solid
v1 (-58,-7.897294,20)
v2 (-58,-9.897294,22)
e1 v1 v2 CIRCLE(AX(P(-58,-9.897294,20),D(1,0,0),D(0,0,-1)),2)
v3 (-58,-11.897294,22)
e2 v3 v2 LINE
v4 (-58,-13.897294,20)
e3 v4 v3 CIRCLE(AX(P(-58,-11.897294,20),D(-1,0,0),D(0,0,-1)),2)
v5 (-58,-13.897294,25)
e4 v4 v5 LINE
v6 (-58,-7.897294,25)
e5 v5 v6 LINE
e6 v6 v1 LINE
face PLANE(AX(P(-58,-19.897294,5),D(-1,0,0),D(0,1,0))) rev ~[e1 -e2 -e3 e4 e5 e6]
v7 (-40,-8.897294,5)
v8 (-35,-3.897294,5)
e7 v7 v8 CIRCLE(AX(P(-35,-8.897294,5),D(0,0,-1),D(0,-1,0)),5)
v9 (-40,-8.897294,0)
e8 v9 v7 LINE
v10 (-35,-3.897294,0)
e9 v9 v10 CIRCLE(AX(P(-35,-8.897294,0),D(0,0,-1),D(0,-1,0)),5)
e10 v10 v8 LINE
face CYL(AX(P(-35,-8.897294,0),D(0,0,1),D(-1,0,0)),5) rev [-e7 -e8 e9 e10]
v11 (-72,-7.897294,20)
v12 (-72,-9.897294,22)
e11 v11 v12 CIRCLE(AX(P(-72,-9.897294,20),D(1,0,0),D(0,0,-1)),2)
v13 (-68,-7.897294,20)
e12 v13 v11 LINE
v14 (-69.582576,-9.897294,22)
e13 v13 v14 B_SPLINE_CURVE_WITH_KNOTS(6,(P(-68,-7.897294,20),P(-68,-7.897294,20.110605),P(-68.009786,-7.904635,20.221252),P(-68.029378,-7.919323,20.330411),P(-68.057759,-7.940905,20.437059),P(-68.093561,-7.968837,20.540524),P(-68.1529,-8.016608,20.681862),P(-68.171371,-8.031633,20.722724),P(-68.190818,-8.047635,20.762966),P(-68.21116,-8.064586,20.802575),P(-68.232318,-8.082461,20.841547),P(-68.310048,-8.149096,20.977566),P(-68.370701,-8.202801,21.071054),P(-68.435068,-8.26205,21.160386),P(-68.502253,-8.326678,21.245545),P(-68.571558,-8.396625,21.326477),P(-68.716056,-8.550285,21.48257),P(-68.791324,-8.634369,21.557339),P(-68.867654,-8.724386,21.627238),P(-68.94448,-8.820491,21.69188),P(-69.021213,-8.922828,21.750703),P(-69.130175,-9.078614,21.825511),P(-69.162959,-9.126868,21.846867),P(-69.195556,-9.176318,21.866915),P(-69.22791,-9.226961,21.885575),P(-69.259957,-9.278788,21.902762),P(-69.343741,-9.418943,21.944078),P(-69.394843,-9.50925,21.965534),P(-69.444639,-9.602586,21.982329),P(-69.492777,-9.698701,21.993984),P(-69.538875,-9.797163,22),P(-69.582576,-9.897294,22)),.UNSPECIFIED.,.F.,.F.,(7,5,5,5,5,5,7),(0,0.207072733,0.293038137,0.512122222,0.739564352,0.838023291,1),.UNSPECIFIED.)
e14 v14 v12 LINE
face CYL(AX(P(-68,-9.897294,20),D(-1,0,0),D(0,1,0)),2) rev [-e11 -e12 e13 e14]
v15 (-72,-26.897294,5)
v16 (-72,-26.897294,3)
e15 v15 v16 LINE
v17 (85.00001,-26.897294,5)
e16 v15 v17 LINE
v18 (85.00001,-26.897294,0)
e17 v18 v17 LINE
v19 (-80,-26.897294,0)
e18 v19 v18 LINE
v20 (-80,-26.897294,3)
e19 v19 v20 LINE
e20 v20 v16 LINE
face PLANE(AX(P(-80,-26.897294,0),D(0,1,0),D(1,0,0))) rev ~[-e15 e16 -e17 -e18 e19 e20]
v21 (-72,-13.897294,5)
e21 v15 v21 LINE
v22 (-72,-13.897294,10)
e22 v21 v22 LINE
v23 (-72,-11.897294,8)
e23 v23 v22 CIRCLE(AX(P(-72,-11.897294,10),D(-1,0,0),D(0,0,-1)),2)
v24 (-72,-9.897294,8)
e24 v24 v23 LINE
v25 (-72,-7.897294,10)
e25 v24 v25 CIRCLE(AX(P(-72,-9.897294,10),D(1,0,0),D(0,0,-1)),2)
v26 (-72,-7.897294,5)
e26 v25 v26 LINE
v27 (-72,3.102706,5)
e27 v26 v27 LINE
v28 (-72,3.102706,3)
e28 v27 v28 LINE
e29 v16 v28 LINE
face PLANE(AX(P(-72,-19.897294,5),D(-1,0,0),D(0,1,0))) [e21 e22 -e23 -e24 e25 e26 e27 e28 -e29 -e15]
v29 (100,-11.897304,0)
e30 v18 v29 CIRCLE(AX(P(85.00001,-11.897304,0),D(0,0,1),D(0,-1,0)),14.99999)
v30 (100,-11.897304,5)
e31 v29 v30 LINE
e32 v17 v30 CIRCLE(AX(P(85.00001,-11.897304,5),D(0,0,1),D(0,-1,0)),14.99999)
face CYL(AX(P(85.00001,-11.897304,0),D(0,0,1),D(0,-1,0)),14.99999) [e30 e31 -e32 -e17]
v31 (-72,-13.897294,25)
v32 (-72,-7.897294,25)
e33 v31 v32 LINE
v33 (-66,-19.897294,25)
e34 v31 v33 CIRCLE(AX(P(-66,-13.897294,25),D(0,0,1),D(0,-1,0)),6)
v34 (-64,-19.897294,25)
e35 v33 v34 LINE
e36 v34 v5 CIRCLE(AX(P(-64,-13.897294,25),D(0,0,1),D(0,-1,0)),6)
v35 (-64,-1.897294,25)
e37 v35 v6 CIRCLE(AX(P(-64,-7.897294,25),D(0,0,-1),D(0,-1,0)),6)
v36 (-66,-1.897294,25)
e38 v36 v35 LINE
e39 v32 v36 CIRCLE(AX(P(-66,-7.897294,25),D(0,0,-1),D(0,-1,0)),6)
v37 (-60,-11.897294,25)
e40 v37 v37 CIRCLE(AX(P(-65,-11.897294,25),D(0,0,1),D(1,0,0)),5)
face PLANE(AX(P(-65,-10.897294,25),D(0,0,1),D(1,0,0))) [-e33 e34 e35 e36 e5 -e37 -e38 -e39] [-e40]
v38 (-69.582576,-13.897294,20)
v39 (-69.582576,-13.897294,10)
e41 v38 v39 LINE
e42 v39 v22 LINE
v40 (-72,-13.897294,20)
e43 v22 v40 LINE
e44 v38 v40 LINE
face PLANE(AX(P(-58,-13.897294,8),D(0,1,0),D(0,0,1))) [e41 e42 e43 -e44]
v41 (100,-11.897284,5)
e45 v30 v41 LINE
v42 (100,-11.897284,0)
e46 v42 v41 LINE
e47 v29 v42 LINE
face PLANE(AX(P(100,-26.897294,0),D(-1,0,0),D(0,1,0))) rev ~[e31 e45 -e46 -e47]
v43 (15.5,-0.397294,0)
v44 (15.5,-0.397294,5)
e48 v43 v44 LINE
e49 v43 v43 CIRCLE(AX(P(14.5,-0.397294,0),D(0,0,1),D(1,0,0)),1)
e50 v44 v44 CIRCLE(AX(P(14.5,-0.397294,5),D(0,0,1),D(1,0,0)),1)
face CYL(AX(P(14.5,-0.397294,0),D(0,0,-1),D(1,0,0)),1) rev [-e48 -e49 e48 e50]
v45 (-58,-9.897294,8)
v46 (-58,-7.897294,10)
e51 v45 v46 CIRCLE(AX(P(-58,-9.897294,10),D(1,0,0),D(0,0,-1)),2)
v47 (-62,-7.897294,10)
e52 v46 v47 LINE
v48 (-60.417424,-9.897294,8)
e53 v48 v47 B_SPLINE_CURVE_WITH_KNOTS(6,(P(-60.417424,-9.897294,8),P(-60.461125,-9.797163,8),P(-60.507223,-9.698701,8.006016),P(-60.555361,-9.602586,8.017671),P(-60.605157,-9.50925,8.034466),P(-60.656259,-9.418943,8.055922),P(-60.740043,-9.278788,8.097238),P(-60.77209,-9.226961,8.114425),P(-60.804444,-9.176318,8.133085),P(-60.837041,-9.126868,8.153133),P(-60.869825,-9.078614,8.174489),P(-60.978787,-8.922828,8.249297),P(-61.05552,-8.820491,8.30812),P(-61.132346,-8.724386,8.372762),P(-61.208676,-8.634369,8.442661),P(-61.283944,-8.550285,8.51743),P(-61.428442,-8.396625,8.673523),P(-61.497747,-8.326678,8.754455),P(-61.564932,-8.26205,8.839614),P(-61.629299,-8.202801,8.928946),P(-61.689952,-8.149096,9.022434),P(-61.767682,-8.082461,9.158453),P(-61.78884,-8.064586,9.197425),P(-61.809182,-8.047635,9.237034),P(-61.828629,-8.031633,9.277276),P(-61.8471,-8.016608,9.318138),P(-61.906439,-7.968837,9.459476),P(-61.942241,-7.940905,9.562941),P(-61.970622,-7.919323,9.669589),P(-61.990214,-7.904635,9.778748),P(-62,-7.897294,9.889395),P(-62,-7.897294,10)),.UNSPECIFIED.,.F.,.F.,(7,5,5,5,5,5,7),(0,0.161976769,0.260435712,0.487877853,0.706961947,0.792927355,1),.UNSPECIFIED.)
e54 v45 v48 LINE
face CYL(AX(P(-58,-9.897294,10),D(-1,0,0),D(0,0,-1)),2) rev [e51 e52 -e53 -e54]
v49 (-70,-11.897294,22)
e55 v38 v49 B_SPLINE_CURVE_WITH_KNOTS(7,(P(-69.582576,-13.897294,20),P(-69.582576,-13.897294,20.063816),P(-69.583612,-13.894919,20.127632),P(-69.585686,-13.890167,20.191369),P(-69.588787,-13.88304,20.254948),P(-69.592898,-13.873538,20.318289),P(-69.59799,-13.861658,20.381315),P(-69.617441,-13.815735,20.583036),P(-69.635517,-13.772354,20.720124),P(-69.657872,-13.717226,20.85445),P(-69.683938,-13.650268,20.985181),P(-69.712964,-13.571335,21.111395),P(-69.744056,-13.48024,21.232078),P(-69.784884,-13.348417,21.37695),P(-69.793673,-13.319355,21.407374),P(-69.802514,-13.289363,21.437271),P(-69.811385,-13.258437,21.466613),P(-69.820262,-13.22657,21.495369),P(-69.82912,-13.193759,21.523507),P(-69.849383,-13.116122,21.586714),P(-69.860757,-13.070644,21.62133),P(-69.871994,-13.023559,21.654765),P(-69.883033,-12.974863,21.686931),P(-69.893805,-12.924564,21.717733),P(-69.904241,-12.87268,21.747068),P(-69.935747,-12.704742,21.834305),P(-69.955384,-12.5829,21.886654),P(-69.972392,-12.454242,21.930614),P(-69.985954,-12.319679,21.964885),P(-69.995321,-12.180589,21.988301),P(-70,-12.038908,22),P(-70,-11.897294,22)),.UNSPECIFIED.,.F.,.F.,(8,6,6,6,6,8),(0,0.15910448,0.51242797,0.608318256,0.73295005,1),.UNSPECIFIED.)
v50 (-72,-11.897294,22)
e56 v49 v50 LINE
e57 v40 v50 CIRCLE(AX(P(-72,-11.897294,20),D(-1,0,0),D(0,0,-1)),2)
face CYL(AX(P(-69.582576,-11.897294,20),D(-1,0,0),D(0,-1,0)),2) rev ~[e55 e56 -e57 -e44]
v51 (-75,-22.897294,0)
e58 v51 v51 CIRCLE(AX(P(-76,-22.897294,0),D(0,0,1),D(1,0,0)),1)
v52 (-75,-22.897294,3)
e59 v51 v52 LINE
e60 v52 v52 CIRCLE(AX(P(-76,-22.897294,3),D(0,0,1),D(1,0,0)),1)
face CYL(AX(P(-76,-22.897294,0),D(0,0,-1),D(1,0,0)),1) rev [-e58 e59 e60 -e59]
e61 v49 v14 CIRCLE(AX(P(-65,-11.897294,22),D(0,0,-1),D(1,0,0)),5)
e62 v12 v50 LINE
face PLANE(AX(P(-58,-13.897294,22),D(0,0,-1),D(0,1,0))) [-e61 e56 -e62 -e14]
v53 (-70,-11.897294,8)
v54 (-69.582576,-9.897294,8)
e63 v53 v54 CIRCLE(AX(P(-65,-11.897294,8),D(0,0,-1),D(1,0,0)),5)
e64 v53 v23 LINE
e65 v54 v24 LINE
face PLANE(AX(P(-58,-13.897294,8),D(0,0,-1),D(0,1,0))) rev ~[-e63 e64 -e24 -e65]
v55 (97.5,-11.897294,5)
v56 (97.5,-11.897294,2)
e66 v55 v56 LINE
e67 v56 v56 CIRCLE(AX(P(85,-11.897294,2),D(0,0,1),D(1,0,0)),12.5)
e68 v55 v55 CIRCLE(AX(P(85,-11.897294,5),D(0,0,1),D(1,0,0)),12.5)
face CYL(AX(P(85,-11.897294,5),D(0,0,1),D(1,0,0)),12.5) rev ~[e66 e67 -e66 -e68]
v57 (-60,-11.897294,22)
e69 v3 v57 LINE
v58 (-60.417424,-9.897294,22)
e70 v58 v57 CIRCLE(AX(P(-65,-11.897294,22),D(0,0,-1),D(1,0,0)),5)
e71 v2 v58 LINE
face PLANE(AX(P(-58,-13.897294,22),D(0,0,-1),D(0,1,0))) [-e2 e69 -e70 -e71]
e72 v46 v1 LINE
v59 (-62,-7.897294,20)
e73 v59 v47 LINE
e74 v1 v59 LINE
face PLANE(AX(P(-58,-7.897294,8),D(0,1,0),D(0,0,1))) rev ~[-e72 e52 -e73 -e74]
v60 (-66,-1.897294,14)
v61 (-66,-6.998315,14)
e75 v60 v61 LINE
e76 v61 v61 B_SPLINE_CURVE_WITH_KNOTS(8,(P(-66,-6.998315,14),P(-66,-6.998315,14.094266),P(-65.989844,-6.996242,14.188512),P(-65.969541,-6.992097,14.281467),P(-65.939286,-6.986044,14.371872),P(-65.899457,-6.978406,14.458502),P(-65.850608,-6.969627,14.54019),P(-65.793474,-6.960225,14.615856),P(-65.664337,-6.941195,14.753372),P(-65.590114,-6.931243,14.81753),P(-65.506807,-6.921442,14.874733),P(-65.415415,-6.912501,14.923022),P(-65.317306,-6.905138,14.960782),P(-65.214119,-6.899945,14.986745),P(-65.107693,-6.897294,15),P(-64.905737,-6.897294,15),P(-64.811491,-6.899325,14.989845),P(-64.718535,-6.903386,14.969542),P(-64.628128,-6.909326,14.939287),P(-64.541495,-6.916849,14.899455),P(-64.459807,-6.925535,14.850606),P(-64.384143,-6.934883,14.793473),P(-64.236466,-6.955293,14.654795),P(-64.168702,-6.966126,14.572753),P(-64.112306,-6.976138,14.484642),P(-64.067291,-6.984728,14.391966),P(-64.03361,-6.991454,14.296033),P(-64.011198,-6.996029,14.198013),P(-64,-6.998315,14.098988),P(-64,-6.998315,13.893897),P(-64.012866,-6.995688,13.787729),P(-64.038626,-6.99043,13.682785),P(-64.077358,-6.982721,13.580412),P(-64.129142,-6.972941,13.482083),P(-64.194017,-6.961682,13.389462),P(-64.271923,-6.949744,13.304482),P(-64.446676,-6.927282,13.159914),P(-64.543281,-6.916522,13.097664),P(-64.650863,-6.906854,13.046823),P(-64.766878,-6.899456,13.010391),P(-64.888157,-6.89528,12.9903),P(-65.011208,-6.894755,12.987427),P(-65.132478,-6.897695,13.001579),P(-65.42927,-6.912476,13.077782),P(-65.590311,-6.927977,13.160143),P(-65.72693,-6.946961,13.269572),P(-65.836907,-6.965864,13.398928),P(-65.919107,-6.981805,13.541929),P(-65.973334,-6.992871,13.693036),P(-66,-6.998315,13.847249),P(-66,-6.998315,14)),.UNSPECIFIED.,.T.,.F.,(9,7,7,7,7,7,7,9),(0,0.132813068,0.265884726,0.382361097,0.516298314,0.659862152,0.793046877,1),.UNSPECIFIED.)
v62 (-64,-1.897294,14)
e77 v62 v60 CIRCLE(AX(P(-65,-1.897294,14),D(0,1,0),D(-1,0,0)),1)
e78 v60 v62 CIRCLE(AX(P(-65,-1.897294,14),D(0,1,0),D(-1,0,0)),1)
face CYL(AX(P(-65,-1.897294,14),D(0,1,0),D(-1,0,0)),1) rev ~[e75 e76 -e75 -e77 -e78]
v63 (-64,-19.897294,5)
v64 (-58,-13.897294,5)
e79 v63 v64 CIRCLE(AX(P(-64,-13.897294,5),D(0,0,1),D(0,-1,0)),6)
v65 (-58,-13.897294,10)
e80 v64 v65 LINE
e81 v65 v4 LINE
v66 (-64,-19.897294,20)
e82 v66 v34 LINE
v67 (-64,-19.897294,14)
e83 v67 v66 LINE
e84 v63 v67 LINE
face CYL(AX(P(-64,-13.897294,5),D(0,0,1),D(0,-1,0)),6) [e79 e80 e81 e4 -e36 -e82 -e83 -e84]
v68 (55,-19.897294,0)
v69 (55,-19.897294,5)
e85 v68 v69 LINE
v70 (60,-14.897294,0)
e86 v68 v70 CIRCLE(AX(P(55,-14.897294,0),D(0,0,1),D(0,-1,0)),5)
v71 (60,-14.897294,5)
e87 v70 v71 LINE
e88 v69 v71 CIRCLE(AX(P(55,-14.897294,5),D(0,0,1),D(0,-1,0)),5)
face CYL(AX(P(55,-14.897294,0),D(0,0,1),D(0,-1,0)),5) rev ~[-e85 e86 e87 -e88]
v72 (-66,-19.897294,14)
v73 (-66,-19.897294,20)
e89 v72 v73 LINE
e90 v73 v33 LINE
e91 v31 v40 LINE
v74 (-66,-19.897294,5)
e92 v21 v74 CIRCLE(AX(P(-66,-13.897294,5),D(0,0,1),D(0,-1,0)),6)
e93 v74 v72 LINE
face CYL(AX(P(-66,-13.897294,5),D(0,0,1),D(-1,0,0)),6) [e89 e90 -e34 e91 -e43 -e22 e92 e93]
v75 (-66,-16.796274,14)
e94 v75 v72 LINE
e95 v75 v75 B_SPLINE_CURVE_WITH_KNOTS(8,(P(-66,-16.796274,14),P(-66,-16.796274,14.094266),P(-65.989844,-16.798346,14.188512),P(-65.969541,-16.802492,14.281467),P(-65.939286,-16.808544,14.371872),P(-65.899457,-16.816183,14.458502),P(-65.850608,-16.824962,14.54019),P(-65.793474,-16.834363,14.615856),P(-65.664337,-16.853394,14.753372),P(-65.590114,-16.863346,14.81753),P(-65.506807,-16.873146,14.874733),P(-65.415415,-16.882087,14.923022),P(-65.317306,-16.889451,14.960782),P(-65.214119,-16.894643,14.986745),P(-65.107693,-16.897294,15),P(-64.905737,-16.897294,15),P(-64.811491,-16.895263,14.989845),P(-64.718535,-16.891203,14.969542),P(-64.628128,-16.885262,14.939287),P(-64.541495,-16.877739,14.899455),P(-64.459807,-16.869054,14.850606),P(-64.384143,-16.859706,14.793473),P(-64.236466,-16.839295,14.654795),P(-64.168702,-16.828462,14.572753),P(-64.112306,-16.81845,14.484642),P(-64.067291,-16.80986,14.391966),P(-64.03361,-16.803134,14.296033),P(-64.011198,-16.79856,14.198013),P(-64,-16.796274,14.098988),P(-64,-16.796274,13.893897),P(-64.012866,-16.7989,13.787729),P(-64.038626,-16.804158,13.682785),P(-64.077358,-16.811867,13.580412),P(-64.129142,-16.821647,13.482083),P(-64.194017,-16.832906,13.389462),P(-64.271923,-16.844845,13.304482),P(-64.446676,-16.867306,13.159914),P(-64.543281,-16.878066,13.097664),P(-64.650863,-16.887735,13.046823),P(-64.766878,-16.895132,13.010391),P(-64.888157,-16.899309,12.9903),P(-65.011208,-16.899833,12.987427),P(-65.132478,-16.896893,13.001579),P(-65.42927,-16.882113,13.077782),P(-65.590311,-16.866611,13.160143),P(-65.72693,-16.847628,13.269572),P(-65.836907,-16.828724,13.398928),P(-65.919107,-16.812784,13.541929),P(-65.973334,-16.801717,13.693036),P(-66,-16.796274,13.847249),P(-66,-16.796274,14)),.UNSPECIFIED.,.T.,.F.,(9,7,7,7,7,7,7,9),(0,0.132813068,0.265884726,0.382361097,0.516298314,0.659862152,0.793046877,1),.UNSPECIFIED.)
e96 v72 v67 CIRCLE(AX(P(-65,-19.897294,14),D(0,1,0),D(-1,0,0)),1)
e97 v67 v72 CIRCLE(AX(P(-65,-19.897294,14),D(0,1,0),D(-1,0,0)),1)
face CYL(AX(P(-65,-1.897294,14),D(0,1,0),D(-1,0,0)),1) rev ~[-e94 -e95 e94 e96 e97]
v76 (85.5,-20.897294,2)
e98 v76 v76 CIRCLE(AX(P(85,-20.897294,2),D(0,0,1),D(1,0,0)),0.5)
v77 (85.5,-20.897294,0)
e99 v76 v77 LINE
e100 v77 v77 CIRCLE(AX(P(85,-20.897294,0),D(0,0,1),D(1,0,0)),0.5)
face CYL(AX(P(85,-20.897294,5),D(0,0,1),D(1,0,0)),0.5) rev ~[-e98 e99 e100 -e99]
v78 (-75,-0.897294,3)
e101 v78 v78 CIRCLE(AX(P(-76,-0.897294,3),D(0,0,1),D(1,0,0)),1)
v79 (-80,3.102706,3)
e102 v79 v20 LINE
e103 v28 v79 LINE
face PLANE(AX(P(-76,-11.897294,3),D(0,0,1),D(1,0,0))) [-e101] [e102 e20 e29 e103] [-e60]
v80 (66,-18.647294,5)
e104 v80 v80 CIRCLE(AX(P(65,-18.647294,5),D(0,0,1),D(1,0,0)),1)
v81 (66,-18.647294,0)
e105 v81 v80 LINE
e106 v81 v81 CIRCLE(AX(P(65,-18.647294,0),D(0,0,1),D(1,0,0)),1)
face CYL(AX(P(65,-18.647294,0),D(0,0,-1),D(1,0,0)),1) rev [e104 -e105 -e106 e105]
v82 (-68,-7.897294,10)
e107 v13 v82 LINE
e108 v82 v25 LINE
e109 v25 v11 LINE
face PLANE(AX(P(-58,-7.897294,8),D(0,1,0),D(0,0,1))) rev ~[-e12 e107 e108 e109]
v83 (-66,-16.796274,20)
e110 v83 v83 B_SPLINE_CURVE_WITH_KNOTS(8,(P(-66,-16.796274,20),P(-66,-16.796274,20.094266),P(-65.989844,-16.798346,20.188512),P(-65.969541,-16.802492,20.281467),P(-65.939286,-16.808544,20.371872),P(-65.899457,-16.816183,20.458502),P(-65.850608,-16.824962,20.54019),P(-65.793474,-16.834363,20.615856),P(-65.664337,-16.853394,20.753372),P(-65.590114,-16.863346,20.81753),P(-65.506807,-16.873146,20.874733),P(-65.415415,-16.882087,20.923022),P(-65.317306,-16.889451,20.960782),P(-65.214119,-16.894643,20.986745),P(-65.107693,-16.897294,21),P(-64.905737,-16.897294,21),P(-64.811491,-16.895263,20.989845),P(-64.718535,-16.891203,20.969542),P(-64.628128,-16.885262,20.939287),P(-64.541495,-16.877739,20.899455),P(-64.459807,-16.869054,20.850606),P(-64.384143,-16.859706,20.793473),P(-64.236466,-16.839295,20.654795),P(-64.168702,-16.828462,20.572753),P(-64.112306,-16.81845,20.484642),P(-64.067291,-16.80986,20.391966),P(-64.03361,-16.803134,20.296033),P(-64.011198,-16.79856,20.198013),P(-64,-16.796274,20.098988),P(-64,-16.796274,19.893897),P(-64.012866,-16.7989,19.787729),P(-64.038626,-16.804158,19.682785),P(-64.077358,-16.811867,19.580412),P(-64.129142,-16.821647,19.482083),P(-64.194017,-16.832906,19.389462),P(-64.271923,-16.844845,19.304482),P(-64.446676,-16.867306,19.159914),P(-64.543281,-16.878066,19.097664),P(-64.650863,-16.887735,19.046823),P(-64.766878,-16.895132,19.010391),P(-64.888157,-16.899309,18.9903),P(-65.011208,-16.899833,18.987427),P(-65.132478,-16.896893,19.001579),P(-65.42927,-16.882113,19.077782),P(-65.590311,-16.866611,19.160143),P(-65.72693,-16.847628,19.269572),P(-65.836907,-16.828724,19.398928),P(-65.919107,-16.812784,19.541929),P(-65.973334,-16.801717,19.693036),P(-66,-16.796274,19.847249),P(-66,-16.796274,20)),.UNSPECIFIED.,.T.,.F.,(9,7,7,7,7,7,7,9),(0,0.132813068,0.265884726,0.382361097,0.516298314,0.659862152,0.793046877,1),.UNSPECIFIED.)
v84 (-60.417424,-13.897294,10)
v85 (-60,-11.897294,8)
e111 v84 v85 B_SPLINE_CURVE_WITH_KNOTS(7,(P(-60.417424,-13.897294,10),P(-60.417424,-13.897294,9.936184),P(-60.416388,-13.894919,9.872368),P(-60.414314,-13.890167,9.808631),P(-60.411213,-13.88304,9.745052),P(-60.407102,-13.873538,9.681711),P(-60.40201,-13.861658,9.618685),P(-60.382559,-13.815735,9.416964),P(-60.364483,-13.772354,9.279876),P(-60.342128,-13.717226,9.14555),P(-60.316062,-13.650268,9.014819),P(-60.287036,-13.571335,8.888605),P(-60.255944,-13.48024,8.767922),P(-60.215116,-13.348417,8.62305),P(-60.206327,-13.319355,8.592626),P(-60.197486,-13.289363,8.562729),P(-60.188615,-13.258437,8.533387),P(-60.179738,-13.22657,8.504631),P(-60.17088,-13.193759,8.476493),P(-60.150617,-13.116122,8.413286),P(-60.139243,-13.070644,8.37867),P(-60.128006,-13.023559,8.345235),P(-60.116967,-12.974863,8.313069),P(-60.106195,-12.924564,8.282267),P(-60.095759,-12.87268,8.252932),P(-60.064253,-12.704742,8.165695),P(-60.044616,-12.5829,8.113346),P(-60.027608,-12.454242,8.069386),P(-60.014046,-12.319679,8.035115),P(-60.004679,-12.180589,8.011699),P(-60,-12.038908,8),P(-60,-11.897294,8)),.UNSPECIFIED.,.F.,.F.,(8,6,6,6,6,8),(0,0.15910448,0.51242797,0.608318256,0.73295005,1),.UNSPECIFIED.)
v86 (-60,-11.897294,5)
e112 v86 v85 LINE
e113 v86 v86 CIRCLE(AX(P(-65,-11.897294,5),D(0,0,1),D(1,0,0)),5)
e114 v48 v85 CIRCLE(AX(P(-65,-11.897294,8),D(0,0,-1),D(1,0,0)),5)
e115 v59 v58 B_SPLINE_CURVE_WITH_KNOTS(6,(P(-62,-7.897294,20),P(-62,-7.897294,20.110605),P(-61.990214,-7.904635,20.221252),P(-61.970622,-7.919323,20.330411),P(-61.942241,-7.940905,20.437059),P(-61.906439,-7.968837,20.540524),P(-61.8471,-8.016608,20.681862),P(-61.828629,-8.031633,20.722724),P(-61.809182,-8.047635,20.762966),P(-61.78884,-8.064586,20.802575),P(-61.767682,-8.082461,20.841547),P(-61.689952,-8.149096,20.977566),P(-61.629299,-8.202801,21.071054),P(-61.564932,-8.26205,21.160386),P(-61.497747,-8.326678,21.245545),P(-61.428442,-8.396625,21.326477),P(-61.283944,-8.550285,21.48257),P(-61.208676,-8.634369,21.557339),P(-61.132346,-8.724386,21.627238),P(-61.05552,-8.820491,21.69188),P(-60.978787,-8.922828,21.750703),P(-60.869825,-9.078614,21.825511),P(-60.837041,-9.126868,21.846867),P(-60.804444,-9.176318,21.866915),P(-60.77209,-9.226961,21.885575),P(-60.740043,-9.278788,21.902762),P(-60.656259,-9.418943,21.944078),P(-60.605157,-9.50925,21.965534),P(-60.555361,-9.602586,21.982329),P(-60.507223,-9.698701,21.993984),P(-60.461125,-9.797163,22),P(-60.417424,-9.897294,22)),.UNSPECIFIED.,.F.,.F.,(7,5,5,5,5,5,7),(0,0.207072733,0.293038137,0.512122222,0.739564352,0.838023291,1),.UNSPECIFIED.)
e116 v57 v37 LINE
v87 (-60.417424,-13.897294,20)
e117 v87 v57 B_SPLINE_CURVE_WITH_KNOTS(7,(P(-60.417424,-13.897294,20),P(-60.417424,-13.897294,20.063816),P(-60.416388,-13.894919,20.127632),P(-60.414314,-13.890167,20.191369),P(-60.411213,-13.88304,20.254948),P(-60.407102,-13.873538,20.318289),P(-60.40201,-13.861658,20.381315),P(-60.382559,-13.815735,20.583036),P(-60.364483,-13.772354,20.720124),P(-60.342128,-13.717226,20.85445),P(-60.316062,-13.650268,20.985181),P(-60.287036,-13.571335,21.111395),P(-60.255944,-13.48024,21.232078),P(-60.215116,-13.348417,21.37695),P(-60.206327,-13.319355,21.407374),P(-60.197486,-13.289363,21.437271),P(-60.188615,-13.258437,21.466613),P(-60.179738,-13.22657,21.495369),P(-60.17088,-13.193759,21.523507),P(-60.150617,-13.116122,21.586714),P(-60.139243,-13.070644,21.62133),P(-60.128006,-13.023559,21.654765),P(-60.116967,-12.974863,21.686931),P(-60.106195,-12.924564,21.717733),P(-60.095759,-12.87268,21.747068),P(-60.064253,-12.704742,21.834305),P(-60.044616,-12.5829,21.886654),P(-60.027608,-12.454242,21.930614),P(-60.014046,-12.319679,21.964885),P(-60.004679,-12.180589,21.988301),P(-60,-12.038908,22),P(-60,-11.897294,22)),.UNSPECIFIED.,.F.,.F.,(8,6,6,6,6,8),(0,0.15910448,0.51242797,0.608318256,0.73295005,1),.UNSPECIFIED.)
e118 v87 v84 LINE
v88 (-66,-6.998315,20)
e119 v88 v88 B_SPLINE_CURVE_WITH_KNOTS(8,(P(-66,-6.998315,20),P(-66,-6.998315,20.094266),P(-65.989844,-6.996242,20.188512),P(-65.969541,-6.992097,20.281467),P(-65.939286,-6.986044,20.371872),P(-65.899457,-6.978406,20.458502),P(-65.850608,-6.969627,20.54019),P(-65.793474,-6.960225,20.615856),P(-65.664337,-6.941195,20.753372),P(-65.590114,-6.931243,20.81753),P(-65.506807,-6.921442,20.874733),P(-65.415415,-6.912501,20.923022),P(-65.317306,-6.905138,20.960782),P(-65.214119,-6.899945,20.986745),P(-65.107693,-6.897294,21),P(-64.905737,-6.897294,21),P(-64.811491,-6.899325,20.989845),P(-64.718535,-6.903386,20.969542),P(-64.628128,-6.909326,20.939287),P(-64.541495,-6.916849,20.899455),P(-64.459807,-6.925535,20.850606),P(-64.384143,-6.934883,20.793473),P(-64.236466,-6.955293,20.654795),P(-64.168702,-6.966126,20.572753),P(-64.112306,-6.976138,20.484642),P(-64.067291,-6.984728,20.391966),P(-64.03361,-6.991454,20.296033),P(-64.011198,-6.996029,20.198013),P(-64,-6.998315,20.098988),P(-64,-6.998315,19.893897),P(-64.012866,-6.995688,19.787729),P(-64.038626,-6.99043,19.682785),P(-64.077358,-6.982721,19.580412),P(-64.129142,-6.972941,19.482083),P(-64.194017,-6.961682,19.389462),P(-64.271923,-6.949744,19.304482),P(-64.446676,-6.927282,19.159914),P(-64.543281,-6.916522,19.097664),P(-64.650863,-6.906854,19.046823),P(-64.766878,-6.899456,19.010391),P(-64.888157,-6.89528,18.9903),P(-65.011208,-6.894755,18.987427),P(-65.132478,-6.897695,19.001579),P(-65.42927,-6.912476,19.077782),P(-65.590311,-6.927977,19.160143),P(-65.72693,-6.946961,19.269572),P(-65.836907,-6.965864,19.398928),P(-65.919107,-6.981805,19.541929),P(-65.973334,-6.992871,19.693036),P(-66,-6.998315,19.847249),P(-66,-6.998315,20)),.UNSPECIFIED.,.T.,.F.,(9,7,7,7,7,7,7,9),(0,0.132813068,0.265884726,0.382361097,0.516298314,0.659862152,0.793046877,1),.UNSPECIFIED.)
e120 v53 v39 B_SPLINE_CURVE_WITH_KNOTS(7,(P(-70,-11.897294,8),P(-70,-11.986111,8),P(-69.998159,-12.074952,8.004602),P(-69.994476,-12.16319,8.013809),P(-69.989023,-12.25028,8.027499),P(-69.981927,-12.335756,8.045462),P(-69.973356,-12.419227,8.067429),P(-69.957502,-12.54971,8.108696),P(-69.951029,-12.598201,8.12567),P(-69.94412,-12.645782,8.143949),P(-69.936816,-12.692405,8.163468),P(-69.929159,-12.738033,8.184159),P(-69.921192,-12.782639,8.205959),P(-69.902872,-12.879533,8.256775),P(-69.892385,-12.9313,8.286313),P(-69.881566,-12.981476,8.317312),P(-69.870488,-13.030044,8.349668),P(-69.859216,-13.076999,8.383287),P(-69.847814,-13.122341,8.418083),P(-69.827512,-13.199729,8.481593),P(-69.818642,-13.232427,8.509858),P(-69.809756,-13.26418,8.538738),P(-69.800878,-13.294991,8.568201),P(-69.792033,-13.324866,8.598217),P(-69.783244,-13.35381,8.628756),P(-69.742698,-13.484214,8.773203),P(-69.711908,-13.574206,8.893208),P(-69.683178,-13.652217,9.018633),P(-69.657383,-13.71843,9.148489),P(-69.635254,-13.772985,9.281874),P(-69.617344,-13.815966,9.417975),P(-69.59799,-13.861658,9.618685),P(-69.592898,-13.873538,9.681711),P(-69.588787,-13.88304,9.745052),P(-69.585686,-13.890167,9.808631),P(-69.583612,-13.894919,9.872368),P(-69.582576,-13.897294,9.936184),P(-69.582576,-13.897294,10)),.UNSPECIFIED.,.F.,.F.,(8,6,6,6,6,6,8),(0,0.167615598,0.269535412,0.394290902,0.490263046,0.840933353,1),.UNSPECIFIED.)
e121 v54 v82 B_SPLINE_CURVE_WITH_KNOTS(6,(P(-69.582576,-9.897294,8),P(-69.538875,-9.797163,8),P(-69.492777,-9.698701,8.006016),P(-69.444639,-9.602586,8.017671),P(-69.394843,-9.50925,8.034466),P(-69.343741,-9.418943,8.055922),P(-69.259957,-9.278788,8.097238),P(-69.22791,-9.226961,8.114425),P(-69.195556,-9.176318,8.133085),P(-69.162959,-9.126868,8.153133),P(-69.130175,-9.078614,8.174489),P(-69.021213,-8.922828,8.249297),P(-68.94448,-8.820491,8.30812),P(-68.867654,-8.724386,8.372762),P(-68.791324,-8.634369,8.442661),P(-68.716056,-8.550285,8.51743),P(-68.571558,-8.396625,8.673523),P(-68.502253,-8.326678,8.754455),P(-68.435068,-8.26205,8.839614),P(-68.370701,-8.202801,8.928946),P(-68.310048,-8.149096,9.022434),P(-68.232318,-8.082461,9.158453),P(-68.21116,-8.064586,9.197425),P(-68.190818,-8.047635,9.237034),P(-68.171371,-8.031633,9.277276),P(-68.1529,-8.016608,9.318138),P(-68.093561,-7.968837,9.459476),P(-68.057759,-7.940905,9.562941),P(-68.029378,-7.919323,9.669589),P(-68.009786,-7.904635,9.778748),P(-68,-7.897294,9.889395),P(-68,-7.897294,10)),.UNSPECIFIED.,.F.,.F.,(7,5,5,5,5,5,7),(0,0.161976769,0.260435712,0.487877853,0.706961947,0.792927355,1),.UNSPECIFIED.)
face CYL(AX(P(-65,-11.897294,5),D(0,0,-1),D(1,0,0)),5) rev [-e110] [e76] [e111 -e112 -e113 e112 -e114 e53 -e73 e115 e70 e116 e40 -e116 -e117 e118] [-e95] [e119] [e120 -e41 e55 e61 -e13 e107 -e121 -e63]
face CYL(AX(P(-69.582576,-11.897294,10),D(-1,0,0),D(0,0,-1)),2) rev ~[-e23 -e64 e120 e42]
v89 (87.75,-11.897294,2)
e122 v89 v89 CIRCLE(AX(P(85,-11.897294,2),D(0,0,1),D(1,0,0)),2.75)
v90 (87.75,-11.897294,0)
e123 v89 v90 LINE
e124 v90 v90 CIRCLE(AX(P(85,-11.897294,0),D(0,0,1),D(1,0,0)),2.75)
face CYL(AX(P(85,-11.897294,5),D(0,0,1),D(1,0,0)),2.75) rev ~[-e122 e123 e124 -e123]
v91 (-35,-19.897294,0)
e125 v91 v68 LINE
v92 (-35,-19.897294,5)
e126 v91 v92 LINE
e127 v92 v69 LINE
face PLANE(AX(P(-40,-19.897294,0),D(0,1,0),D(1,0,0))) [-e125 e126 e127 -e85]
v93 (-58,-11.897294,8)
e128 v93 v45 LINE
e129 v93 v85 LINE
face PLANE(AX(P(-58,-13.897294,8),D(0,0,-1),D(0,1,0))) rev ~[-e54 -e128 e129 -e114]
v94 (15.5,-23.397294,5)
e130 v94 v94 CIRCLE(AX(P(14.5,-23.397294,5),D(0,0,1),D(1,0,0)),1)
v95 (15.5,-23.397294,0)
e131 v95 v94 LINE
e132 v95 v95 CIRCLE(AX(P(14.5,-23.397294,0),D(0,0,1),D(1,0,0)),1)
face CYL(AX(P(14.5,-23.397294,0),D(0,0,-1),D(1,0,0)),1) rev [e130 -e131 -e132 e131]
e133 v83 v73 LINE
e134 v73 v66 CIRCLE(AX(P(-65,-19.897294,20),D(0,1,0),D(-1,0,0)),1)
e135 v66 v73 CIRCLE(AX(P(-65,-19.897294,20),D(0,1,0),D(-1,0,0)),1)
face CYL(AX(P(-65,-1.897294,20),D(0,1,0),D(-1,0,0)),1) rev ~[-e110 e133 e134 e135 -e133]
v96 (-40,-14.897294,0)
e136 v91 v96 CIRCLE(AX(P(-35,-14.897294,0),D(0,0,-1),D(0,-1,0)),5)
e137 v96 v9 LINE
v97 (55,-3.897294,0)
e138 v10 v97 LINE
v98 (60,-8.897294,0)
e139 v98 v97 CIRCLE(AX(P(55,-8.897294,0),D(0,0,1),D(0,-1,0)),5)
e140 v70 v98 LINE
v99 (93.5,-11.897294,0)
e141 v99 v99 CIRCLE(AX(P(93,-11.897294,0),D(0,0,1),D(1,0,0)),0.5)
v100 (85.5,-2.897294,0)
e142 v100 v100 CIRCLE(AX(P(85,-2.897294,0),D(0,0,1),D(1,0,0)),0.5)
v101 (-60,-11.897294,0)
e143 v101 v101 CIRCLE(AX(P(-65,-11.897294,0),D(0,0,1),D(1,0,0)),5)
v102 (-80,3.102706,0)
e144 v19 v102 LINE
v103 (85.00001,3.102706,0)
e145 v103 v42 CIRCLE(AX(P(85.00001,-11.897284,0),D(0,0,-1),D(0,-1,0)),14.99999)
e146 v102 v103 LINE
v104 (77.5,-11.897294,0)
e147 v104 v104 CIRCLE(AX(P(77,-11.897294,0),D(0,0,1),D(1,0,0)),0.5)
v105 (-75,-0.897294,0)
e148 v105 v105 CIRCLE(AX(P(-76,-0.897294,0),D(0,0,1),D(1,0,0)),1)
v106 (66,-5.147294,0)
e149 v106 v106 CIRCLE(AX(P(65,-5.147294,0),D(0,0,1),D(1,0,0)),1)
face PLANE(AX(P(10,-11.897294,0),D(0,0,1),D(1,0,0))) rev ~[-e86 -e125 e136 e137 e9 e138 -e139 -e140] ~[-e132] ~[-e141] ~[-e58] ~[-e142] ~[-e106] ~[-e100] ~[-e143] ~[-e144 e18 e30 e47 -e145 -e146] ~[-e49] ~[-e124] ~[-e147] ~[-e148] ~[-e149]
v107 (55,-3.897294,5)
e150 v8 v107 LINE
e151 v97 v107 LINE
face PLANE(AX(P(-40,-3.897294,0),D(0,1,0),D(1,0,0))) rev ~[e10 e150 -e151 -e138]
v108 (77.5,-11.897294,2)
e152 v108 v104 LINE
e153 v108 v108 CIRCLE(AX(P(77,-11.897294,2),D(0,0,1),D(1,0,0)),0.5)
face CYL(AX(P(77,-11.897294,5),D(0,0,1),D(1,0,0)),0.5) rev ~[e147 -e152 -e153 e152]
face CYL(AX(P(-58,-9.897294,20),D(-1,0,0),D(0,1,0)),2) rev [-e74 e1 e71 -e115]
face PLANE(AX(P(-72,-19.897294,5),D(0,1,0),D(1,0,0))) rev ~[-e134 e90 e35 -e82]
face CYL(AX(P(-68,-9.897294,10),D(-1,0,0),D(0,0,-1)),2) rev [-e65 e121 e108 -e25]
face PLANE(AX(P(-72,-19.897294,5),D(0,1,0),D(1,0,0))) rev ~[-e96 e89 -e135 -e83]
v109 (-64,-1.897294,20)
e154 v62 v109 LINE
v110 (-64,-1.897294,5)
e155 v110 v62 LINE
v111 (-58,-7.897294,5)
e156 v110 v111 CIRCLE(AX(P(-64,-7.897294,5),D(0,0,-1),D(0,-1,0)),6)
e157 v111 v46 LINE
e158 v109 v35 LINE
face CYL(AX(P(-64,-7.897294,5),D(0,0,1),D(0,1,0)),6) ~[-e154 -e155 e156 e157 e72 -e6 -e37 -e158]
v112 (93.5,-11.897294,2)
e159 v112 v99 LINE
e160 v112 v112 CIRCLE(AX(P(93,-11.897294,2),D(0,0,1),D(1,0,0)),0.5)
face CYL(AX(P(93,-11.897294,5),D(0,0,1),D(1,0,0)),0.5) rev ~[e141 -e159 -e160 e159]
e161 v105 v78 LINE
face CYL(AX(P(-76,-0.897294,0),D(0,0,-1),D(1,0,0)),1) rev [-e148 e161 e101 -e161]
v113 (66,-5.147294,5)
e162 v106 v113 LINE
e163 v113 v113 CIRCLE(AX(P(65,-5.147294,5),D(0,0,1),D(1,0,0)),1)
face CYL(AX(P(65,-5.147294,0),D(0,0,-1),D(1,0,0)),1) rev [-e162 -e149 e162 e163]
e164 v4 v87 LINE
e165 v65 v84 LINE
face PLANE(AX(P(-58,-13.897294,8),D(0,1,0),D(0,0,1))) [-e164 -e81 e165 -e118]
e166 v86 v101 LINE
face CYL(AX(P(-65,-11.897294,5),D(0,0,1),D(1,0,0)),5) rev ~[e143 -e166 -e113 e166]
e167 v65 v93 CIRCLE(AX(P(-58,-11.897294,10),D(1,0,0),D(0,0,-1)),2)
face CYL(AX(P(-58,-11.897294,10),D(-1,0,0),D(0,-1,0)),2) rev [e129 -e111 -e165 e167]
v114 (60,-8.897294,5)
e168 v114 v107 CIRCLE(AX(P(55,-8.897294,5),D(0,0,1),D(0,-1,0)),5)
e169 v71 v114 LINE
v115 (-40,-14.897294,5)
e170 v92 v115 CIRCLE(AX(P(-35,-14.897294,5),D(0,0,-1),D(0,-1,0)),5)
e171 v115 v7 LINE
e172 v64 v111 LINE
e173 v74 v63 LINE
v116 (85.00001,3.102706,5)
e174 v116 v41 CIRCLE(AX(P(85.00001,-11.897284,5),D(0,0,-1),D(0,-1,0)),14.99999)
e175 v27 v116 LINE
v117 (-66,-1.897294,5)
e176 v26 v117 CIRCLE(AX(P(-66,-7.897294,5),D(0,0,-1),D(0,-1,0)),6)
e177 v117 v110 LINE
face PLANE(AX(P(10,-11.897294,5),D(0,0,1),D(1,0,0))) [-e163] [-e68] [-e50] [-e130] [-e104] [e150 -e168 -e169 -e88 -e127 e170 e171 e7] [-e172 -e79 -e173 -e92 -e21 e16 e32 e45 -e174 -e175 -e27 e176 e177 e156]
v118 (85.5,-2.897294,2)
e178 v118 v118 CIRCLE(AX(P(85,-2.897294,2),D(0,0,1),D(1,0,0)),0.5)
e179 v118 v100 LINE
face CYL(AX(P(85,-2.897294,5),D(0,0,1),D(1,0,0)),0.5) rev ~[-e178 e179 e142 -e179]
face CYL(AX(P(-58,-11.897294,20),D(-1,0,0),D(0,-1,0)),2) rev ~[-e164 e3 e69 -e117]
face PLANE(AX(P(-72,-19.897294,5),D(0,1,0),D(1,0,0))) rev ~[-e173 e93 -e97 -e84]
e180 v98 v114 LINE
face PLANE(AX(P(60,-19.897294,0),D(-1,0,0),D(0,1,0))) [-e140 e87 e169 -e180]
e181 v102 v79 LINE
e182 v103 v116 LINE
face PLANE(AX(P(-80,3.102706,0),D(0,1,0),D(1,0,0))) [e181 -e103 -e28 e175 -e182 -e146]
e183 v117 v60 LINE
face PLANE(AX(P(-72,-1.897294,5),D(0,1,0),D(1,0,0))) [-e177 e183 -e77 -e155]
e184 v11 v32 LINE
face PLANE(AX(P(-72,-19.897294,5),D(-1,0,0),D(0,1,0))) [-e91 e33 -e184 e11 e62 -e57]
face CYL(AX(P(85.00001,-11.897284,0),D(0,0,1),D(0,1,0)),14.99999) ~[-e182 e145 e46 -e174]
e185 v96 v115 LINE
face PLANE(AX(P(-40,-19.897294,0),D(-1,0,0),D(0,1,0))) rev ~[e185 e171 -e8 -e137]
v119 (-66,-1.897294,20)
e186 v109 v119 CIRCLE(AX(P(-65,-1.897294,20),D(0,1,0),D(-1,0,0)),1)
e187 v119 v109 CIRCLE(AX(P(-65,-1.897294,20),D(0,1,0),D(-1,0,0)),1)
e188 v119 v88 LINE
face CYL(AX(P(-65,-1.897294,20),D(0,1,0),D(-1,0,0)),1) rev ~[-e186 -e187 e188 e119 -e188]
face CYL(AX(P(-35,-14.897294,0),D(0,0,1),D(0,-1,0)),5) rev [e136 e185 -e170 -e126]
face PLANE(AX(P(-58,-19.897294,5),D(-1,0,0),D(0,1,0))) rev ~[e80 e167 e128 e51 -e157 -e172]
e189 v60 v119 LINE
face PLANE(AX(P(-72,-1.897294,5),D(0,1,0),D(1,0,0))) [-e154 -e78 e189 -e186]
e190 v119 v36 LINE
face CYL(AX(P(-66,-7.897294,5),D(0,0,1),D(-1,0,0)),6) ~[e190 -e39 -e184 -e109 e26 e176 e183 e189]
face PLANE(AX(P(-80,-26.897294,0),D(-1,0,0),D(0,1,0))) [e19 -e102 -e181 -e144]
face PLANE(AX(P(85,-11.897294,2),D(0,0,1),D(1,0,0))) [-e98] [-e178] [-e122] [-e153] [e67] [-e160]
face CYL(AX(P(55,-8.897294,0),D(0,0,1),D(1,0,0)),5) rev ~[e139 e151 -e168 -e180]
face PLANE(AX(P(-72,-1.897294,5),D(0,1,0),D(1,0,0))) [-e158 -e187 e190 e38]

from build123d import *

# Parameters (mm, degrees)
F0_W      = 180
F0_H      = 30
F0_R      = 1
F0_W_2    = 100
F0_H_2    = 16
F1_DEPTH  = 5
F2_R      = 12.5
F2_R_2    = 0.5
F2_R_3    = 2.75
F3_DEPTH  = 3
F4_DEPTH  = 25
F5_R      = 14.99999
F2_R_4    = 5
F6_DEPTH  = 25
F7_R      = 5
F2_W      = 14
F2_H      = 18
F8_DEPTH  = 20
F9_R      = 6
F2_R_5    = 1
F10_DEPTH = 2
F11_W     = 6
F11_H     = 14
F12_DEPTH = 25
F13_R     = 2
F15_DEPTH = 25


# Not quite as in the source:
# - a fillet or chamfer is up to 0.001 mm smaller than in the source, because OpenCascade refuses the exact size


with BuildPart() as f1:
    # F0 (on Top) → F1 (new body)
    with BuildSketch(Plane.XY):
        with Locations((10, -11.8972941886)):
            Rectangle(F0_W, F0_H)
        with Locations((-76, -22.8972941886)):
            Circle(F0_R, mode=Mode.SUBTRACT)
        with Locations((14.5, -23.3972941886)):
            Circle(F0_R, mode=Mode.SUBTRACT)
        with Locations((10, -11.8972941886)):
            Rectangle(F0_W_2, F0_H_2, mode=Mode.SUBTRACT)
        with Locations((65, -18.6472941886)):
            Circle(F0_R, mode=Mode.SUBTRACT)
        with Locations((-76, -0.8972941886)):
            Circle(F0_R, mode=Mode.SUBTRACT)
        with Locations((65, -5.1472941886)):
            Circle(F0_R, mode=Mode.SUBTRACT)
        with Locations((14.5, -0.3972941886)):
            Circle(F0_R, mode=Mode.SUBTRACT)
    extrude(amount=F1_DEPTH)

    # F2 (on face) → F3 (cut)
    with BuildSketch(Plane.XY.offset(5)):
        with Locations((85, -11.8972941886)):
            Circle(F2_R)
        with Locations((85, -20.8972941886)):
            Circle(F2_R_2, mode=Mode.SUBTRACT)
        with Locations((85, -11.8972941886)):
            Circle(F2_R_3, mode=Mode.SUBTRACT)
        with Locations((77, -11.8972941886)):
            Circle(F2_R_2, mode=Mode.SUBTRACT)
        with Locations((93, -11.8972941886)):
            Circle(F2_R_2, mode=Mode.SUBTRACT)
        with Locations((85, -2.8972941886)):
            Circle(F2_R_2, mode=Mode.SUBTRACT)
    extrude(amount=-F3_DEPTH, mode=Mode.SUBTRACT)

    # F2 (on face) → F4 (cut)
    with BuildSketch(Plane.XY.offset(5)):
        with Locations((85, -11.8972941886)):
            Circle(F2_R_3)
        with Locations((85, -2.8972941886)):
            Circle(F2_R_2)
        with Locations((77, -11.8972941886)):
            Circle(F2_R_2)
        with Locations((85, -20.8972941886)):
            Circle(F2_R_2)
        with Locations((93, -11.8972941886)):
            Circle(F2_R_2)
    extrude(amount=-F4_DEPTH, mode=Mode.SUBTRACT)

    # F5 (radius 15 in the source; OpenCascade refuses exactly that, so slightly less here)
    f5_edges = [f1.edges().sort_by_distance(p)[0] for p in [
        (100, 3.102706, 2.5),
        (100, -26.897294, 2.5),
    ]]
    fillet(f5_edges, radius=F5_R)

    # F2 (on face) → F6 (cut)
    with BuildSketch(Plane.XY.offset(5)):
        with Locations((-65, -11.8972941886)):
            Circle(F2_R_4)
    extrude(amount=-F6_DEPTH, mode=Mode.SUBTRACT)

    # F7
    f7_edges = [f1.edges().sort_by_distance(p)[0] for p in [
        (-40, -3.897294, 2.5),
        (-40, -19.897294, 2.5),
        (60, -3.897294, 2.5),
        (60, -19.897294, 2.5),
    ]]
    fillet(f7_edges, radius=F7_R)

    # F2 (on face) → F8 (join)
    with BuildSketch(Plane.XY.offset(5)):
        with Locations((-65, -10.8972941886)):
            Rectangle(F2_W, F2_H)
        with Locations((-65, -11.8972941886)):
            Circle(F2_R_4, mode=Mode.SUBTRACT)
    extrude(amount=F8_DEPTH)

    # F9
    f9_edges = [f1.edges().sort_by_distance(p)[0] for p in [
        (-72, -19.897294, 15),
        (-58, -19.897294, 15),
        (-72, -1.897294, 15),
        (-58, -1.897294, 15),
    ]]
    fillet(f9_edges, radius=F9_R)

    # F2 (on face) → F10 (cut)
    with BuildSketch(Plane.XY.offset(5)):
        Polygon((-72, -19.8972941886), (-72, -1.8972941886), (-72, 3.1027058114), (-80, 3.1027058114), (-80, -26.8972941886), (-72, -26.8972941886), align=None)
        with Locations((-76, -22.8972941886)):
            Circle(F2_R_5, mode=Mode.SUBTRACT)
        with Locations((-76, -0.8972941886)):
            Circle(F2_R_5, mode=Mode.SUBTRACT)
    extrude(amount=-F10_DEPTH, mode=Mode.SUBTRACT)

    # F11 (on face) → F12 (cut)
    with BuildSketch(Plane.YZ.offset(-58)):
        with Locations((-10.8972941886, 15)):
            Rectangle(F11_W, F11_H)
    extrude(amount=-F12_DEPTH, mode=Mode.SUBTRACT)

    # F13
    f13_edges = [f1.edges().sort_by_distance(p)[0] for p in [
        (-59.208712, -13.897294, 8),
        (-60, -7.897294, 8),
        (-60, -7.897294, 22),
        (-59.208712, -13.897294, 22),
        (-70.791288, -13.897294, 8),
        (-70, -7.897294, 8),
        (-70, -7.897294, 22),
        (-70.791288, -13.897294, 22),
    ]]
    fillet(f13_edges, radius=F13_R)

    # F14 (on face) → F15 (cut)
    with BuildSketch(Plane(origin=(0, -1.8972941886, 0), x_dir=(-1, 0, 0), z_dir=(0, 1, 0))):
        with BuildLine():
            ThreePointArc((64, 20), (65, 19), (66, 20))
            ThreePointArc((66, 20), (65, 21), (64, 20))
        make_face()
        with BuildLine():
            ThreePointArc((64, 14), (65, 13), (66, 14))
            ThreePointArc((66, 14), (65, 15), (64, 14))
        make_face()
    extrude(amount=-F15_DEPTH, mode=Mode.SUBTRACT)


solid = f1.part
